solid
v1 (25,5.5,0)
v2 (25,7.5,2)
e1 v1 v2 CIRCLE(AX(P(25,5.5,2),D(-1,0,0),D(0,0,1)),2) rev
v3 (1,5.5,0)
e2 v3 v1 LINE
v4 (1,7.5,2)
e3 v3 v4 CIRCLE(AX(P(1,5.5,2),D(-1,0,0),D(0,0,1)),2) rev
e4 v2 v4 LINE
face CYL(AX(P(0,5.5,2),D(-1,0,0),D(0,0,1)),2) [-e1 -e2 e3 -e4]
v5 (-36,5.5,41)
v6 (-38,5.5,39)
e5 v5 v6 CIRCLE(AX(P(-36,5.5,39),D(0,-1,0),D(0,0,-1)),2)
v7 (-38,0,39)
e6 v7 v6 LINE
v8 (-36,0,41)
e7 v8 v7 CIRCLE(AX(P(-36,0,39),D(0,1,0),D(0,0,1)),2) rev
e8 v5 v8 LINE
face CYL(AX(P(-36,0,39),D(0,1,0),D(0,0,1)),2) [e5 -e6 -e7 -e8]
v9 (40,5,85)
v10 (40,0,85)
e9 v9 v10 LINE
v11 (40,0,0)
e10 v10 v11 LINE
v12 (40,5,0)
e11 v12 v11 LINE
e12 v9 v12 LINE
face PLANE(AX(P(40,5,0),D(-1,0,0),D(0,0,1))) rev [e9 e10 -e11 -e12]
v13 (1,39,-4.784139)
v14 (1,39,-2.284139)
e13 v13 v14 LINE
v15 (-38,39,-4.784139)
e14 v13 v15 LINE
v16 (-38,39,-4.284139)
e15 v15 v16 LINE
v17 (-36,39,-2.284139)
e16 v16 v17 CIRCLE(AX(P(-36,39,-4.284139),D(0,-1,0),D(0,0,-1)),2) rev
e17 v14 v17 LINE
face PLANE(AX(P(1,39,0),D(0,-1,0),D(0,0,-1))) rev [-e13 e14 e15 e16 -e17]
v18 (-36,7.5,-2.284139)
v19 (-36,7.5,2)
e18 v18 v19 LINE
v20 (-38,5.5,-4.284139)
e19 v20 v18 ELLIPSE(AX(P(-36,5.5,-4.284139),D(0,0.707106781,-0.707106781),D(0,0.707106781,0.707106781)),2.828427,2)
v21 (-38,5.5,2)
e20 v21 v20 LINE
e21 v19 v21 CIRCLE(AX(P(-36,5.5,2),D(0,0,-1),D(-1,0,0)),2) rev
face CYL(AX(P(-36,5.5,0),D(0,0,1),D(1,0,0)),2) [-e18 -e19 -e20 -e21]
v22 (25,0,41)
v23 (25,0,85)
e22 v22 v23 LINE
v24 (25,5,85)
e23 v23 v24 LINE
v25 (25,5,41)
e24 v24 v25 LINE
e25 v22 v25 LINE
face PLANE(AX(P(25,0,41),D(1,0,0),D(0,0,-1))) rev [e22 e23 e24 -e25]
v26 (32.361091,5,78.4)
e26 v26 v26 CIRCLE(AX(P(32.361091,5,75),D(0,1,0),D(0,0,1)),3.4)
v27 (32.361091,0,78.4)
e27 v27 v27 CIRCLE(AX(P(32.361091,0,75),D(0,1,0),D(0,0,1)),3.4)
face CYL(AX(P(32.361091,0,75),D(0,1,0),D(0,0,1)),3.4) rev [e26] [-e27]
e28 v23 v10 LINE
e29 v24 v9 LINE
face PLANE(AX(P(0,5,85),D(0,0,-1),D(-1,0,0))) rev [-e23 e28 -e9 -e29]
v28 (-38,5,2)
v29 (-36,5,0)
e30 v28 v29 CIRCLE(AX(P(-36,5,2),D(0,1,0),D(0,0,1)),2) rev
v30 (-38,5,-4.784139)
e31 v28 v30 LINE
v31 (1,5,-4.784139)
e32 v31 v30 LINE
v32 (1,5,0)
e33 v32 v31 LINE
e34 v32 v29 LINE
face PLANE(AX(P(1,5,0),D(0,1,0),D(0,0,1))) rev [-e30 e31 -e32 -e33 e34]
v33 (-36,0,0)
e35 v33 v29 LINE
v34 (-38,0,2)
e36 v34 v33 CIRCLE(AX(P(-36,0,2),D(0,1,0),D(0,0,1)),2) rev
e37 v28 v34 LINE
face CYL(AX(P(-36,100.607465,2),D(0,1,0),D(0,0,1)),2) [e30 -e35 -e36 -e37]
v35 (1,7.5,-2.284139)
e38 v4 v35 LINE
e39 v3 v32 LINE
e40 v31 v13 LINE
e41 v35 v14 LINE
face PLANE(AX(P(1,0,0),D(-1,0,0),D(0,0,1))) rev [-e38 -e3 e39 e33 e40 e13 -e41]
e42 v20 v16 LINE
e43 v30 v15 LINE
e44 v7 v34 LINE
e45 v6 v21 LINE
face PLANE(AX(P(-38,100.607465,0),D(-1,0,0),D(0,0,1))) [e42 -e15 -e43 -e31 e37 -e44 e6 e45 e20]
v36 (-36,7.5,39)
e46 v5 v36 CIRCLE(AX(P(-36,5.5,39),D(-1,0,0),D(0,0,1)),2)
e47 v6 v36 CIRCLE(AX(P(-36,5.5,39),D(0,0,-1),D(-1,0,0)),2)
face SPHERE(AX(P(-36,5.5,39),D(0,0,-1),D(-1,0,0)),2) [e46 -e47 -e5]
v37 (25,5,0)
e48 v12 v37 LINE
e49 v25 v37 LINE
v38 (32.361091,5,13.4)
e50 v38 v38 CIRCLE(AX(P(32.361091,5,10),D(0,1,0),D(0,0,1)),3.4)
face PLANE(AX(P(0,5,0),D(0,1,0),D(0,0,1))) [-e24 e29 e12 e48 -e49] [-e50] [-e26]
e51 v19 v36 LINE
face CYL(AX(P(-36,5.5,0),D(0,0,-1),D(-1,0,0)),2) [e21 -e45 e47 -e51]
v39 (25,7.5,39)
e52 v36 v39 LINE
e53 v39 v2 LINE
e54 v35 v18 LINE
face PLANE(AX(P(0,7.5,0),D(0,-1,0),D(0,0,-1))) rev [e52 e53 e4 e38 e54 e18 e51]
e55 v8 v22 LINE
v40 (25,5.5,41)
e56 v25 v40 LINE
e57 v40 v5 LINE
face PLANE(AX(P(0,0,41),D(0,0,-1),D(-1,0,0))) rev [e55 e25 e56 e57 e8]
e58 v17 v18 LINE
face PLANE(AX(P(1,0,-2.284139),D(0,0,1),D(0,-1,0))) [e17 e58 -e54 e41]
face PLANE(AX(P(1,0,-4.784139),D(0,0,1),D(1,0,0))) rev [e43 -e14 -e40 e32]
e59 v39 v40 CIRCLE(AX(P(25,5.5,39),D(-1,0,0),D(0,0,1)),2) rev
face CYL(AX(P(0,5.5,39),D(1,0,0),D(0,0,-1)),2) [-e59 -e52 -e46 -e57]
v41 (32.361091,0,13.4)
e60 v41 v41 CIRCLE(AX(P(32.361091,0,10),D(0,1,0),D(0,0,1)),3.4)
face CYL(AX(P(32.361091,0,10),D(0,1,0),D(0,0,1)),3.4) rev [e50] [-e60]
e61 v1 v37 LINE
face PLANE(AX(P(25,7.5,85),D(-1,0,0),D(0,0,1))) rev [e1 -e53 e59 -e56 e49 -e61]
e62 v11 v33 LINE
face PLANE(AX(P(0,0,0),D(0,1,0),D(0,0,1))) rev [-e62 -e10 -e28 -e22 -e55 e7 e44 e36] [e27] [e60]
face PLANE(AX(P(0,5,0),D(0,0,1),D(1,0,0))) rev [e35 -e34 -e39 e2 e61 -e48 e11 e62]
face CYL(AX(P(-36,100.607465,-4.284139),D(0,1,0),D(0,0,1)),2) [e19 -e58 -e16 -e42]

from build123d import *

# Parameters (mm, degrees)
SKETCH_1_W          = 40
SKETCH_1_H          = 85
EXTRUDE_1_DEPTH     = 5
SKETCH_2_W          = 25
SKETCH_2_H          = 85
EXTRUDE_2_DEPTH     = 2.5
EXTRUDE_START       = -7.5
SKETCH_5_W          = 38
SKETCH_5_H          = 85
EXTRUDE_3_DEPTH     = 7.5
SKETCH_3_R          = 3.4
CUT_EXTRUDE_1_DEPTH = 95.074438611
SKETCH_6_R          = 3.4
CUT_EXTRUDE_2_DEPTH = 95.074438611
FILLET_1_R          = 2
FILLET_2_R          = 2
SKETCH_7_W          = 63
SKETCH_7_H          = 17.986542749
CUT_EXTRUDE_3_DEPTH = 44
FILLET_3_R          = 2
EXTRUDE_4_DEPTH     = 39
FILLET_4_R          = 2


with BuildPart() as part:
    # 草图1 → 凸台-拉伸1 (new body)
    with BuildSketch(Plane(origin=(0, 0, 0), x_dir=(1, 0, 0), z_dir=(0, 1, 0))):
        with Locations((20, -42.5)):
            Rectangle(SKETCH_1_W, SKETCH_1_H)
    extrude(amount=EXTRUDE_1_DEPTH)

    # 草图2 → 凸台-拉伸2 (add)
    with BuildSketch(Plane(origin=(0, 5, 0), x_dir=(1, 0, 0), z_dir=(0, 1, 0))):
        with Locations((12.5, -42.5)):
            Rectangle(SKETCH_2_W, SKETCH_2_H)
    extrude(amount=EXTRUDE_2_DEPTH)

    # 草图5 → 凸台-拉伸3 (add)
    with BuildSketch(Plane.XZ.offset(EXTRUDE_START)):
        with Locations((-19, 42.5)):
            Rectangle(SKETCH_5_W, SKETCH_5_H)
    extrude(amount=EXTRUDE_3_DEPTH)

    # 草图3 → 切除-拉伸1 (cut, through all)
    with BuildSketch(Plane(origin=(0, 5, 0), x_dir=(1, 0, 0), z_dir=(0, 1, 0))):
        with Locations(Location((32.361090949, -75, 0), (0, 0, 270))):
            Circle(SKETCH_3_R)
    extrude(amount=-CUT_EXTRUDE_1_DEPTH, mode=Mode.SUBTRACT)

    # 草图6 → 切除-拉伸2 (cut, through all)
    with BuildSketch(Plane(origin=(0, 5, 0), x_dir=(1, 0, 0), z_dir=(0, 1, 0))):
        with Locations(Location((32.361090949, -10, 0), (0, 0, 270))):
            Circle(SKETCH_6_R)
    extrude(amount=-CUT_EXTRUDE_2_DEPTH, mode=Mode.SUBTRACT)

    # 圆角1
    fillet_1_edges = [part.edges().sort_by_distance(p)[0] for p in [
        (-6.5, 7.5, 85),
        (-38, 7.5, 42.5),
    ]]
    fillet(fillet_1_edges, radius=FILLET_1_R)

    # 圆角2
    # the kernel refuses this fillet: 2 mm, written as the material it takes off along each edge
    with BuildSketch(Plane(origin=(-36, 5.5, 83), x_dir=(0, 0, 1), z_dir=(-1, 0, 0))) as fillet_2_piece_1_section:
        Polygon((0, 0), (FILLET_2_R, 0), (FILLET_2_R, FILLET_2_R), (0, FILLET_2_R), align=None)
    fillet_2_piece_1 = extrude(amount=FILLET_2_R, mode=Mode.PRIVATE)
    fillet_2_piece_1 = fillet_2_piece_1 - Plane(origin=(-36, 5.5, 83), x_dir=(0, -0.7071067811865475, -0.7071067811865475), z_dir=(-1, 0, 0)) * Sphere(FILLET_2_R, mode=Mode.PRIVATE)
    add(fillet_2_piece_1, mode=Mode.SUBTRACT)
    with BuildSketch(Plane(origin=(-36, 7.5, 0), x_dir=(0, -1, 0), z_dir=(1, 0, 0))) as fillet_2_piece_2:
        with BuildLine():
            CenterArc((FILLET_2_R, -FILLET_2_R), FILLET_2_R, 90, 90)
            Line((0, -FILLET_2_R), (0, 0))
            Line((0, 0), (FILLET_2_R, 0))
        make_face()
    extrude(amount=66, mode=Mode.SUBTRACT)
    with BuildSketch(Plane(origin=(-38, 5.5, 85), x_dir=(0, 0, -1), z_dir=(0, -1, 0)), Plane(origin=(-38, 5.5, 0), x_dir=(1, 0, 0), z_dir=(0, -1, 0))) as fillet_2_piece_3:
        with BuildLine():
            CenterArc((FILLET_2_R, FILLET_2_R), FILLET_2_R, 180, 90)
            Line((0, FILLET_2_R), (0, 0))
            Line((0, 0), (FILLET_2_R, 0))
        make_face()
    extrude(amount=10.5, mode=Mode.SUBTRACT)
    with BuildSketch(Plane(origin=(-36, 5.5, 0), x_dir=(-1, 0, 0), z_dir=(0, -1, 0))) as fillet_2_piece_4:
        with BuildLine():
            CenterArc((2 - FILLET_2_R, -FILLET_2_R), FILLET_2_R, 0, 90)
            Line((2, -FILLET_2_R), (2, 0))
            Line((2, 0), (2 - FILLET_2_R, 0))
        make_face()
    revolve(axis=Axis((-36, 5.5, 0), (0, 0, -1)), revolution_arc=90, mode=Mode.SUBTRACT)

    # 草图7 → 切除-拉伸3 (cut)
    with BuildSketch(Plane.XY.offset(85)):
        with Locations((-6.5, 8.993271375)):
            Rectangle(SKETCH_7_W, SKETCH_7_H)
    extrude(amount=-CUT_EXTRUDE_3_DEPTH, mode=Mode.SUBTRACT)

    # 圆角3
    fillet_3_edges = [part.edges().sort_by_distance(p)[0] for p in [
        (-37.414213562, 6.914213562, 41),
        (-5.5, 7.5, 41),
        (-38, 2.75, 41),
    ]]
    fillet(fillet_3_edges, radius=FILLET_3_R)

    # 草图8 → 凸台-拉伸4 (add)
    with BuildSketch(Plane.ZY.offset(38)):
        Polygon((-1.392069631, 5), (2, 5), (2, 5.5), (2, 7.5), (-2.284139263, 7.5), (-2.284139263, 39), (-4.784139263, 39), (-4.784139263, 7.572997811), (-4.784139263, 5), align=None)
    extrude(amount=-EXTRUDE_4_DEPTH)

    # 圆角4
    fillet_4_edges = [part.edges().sort_by_distance(p)[0] for p in [
        (-38, 23.25, -2.284139263),
        (-38, 7.5, -0.142069631),
    ]]
    fillet(fillet_4_edges, radius=FILLET_4_R)


solid = part.part
